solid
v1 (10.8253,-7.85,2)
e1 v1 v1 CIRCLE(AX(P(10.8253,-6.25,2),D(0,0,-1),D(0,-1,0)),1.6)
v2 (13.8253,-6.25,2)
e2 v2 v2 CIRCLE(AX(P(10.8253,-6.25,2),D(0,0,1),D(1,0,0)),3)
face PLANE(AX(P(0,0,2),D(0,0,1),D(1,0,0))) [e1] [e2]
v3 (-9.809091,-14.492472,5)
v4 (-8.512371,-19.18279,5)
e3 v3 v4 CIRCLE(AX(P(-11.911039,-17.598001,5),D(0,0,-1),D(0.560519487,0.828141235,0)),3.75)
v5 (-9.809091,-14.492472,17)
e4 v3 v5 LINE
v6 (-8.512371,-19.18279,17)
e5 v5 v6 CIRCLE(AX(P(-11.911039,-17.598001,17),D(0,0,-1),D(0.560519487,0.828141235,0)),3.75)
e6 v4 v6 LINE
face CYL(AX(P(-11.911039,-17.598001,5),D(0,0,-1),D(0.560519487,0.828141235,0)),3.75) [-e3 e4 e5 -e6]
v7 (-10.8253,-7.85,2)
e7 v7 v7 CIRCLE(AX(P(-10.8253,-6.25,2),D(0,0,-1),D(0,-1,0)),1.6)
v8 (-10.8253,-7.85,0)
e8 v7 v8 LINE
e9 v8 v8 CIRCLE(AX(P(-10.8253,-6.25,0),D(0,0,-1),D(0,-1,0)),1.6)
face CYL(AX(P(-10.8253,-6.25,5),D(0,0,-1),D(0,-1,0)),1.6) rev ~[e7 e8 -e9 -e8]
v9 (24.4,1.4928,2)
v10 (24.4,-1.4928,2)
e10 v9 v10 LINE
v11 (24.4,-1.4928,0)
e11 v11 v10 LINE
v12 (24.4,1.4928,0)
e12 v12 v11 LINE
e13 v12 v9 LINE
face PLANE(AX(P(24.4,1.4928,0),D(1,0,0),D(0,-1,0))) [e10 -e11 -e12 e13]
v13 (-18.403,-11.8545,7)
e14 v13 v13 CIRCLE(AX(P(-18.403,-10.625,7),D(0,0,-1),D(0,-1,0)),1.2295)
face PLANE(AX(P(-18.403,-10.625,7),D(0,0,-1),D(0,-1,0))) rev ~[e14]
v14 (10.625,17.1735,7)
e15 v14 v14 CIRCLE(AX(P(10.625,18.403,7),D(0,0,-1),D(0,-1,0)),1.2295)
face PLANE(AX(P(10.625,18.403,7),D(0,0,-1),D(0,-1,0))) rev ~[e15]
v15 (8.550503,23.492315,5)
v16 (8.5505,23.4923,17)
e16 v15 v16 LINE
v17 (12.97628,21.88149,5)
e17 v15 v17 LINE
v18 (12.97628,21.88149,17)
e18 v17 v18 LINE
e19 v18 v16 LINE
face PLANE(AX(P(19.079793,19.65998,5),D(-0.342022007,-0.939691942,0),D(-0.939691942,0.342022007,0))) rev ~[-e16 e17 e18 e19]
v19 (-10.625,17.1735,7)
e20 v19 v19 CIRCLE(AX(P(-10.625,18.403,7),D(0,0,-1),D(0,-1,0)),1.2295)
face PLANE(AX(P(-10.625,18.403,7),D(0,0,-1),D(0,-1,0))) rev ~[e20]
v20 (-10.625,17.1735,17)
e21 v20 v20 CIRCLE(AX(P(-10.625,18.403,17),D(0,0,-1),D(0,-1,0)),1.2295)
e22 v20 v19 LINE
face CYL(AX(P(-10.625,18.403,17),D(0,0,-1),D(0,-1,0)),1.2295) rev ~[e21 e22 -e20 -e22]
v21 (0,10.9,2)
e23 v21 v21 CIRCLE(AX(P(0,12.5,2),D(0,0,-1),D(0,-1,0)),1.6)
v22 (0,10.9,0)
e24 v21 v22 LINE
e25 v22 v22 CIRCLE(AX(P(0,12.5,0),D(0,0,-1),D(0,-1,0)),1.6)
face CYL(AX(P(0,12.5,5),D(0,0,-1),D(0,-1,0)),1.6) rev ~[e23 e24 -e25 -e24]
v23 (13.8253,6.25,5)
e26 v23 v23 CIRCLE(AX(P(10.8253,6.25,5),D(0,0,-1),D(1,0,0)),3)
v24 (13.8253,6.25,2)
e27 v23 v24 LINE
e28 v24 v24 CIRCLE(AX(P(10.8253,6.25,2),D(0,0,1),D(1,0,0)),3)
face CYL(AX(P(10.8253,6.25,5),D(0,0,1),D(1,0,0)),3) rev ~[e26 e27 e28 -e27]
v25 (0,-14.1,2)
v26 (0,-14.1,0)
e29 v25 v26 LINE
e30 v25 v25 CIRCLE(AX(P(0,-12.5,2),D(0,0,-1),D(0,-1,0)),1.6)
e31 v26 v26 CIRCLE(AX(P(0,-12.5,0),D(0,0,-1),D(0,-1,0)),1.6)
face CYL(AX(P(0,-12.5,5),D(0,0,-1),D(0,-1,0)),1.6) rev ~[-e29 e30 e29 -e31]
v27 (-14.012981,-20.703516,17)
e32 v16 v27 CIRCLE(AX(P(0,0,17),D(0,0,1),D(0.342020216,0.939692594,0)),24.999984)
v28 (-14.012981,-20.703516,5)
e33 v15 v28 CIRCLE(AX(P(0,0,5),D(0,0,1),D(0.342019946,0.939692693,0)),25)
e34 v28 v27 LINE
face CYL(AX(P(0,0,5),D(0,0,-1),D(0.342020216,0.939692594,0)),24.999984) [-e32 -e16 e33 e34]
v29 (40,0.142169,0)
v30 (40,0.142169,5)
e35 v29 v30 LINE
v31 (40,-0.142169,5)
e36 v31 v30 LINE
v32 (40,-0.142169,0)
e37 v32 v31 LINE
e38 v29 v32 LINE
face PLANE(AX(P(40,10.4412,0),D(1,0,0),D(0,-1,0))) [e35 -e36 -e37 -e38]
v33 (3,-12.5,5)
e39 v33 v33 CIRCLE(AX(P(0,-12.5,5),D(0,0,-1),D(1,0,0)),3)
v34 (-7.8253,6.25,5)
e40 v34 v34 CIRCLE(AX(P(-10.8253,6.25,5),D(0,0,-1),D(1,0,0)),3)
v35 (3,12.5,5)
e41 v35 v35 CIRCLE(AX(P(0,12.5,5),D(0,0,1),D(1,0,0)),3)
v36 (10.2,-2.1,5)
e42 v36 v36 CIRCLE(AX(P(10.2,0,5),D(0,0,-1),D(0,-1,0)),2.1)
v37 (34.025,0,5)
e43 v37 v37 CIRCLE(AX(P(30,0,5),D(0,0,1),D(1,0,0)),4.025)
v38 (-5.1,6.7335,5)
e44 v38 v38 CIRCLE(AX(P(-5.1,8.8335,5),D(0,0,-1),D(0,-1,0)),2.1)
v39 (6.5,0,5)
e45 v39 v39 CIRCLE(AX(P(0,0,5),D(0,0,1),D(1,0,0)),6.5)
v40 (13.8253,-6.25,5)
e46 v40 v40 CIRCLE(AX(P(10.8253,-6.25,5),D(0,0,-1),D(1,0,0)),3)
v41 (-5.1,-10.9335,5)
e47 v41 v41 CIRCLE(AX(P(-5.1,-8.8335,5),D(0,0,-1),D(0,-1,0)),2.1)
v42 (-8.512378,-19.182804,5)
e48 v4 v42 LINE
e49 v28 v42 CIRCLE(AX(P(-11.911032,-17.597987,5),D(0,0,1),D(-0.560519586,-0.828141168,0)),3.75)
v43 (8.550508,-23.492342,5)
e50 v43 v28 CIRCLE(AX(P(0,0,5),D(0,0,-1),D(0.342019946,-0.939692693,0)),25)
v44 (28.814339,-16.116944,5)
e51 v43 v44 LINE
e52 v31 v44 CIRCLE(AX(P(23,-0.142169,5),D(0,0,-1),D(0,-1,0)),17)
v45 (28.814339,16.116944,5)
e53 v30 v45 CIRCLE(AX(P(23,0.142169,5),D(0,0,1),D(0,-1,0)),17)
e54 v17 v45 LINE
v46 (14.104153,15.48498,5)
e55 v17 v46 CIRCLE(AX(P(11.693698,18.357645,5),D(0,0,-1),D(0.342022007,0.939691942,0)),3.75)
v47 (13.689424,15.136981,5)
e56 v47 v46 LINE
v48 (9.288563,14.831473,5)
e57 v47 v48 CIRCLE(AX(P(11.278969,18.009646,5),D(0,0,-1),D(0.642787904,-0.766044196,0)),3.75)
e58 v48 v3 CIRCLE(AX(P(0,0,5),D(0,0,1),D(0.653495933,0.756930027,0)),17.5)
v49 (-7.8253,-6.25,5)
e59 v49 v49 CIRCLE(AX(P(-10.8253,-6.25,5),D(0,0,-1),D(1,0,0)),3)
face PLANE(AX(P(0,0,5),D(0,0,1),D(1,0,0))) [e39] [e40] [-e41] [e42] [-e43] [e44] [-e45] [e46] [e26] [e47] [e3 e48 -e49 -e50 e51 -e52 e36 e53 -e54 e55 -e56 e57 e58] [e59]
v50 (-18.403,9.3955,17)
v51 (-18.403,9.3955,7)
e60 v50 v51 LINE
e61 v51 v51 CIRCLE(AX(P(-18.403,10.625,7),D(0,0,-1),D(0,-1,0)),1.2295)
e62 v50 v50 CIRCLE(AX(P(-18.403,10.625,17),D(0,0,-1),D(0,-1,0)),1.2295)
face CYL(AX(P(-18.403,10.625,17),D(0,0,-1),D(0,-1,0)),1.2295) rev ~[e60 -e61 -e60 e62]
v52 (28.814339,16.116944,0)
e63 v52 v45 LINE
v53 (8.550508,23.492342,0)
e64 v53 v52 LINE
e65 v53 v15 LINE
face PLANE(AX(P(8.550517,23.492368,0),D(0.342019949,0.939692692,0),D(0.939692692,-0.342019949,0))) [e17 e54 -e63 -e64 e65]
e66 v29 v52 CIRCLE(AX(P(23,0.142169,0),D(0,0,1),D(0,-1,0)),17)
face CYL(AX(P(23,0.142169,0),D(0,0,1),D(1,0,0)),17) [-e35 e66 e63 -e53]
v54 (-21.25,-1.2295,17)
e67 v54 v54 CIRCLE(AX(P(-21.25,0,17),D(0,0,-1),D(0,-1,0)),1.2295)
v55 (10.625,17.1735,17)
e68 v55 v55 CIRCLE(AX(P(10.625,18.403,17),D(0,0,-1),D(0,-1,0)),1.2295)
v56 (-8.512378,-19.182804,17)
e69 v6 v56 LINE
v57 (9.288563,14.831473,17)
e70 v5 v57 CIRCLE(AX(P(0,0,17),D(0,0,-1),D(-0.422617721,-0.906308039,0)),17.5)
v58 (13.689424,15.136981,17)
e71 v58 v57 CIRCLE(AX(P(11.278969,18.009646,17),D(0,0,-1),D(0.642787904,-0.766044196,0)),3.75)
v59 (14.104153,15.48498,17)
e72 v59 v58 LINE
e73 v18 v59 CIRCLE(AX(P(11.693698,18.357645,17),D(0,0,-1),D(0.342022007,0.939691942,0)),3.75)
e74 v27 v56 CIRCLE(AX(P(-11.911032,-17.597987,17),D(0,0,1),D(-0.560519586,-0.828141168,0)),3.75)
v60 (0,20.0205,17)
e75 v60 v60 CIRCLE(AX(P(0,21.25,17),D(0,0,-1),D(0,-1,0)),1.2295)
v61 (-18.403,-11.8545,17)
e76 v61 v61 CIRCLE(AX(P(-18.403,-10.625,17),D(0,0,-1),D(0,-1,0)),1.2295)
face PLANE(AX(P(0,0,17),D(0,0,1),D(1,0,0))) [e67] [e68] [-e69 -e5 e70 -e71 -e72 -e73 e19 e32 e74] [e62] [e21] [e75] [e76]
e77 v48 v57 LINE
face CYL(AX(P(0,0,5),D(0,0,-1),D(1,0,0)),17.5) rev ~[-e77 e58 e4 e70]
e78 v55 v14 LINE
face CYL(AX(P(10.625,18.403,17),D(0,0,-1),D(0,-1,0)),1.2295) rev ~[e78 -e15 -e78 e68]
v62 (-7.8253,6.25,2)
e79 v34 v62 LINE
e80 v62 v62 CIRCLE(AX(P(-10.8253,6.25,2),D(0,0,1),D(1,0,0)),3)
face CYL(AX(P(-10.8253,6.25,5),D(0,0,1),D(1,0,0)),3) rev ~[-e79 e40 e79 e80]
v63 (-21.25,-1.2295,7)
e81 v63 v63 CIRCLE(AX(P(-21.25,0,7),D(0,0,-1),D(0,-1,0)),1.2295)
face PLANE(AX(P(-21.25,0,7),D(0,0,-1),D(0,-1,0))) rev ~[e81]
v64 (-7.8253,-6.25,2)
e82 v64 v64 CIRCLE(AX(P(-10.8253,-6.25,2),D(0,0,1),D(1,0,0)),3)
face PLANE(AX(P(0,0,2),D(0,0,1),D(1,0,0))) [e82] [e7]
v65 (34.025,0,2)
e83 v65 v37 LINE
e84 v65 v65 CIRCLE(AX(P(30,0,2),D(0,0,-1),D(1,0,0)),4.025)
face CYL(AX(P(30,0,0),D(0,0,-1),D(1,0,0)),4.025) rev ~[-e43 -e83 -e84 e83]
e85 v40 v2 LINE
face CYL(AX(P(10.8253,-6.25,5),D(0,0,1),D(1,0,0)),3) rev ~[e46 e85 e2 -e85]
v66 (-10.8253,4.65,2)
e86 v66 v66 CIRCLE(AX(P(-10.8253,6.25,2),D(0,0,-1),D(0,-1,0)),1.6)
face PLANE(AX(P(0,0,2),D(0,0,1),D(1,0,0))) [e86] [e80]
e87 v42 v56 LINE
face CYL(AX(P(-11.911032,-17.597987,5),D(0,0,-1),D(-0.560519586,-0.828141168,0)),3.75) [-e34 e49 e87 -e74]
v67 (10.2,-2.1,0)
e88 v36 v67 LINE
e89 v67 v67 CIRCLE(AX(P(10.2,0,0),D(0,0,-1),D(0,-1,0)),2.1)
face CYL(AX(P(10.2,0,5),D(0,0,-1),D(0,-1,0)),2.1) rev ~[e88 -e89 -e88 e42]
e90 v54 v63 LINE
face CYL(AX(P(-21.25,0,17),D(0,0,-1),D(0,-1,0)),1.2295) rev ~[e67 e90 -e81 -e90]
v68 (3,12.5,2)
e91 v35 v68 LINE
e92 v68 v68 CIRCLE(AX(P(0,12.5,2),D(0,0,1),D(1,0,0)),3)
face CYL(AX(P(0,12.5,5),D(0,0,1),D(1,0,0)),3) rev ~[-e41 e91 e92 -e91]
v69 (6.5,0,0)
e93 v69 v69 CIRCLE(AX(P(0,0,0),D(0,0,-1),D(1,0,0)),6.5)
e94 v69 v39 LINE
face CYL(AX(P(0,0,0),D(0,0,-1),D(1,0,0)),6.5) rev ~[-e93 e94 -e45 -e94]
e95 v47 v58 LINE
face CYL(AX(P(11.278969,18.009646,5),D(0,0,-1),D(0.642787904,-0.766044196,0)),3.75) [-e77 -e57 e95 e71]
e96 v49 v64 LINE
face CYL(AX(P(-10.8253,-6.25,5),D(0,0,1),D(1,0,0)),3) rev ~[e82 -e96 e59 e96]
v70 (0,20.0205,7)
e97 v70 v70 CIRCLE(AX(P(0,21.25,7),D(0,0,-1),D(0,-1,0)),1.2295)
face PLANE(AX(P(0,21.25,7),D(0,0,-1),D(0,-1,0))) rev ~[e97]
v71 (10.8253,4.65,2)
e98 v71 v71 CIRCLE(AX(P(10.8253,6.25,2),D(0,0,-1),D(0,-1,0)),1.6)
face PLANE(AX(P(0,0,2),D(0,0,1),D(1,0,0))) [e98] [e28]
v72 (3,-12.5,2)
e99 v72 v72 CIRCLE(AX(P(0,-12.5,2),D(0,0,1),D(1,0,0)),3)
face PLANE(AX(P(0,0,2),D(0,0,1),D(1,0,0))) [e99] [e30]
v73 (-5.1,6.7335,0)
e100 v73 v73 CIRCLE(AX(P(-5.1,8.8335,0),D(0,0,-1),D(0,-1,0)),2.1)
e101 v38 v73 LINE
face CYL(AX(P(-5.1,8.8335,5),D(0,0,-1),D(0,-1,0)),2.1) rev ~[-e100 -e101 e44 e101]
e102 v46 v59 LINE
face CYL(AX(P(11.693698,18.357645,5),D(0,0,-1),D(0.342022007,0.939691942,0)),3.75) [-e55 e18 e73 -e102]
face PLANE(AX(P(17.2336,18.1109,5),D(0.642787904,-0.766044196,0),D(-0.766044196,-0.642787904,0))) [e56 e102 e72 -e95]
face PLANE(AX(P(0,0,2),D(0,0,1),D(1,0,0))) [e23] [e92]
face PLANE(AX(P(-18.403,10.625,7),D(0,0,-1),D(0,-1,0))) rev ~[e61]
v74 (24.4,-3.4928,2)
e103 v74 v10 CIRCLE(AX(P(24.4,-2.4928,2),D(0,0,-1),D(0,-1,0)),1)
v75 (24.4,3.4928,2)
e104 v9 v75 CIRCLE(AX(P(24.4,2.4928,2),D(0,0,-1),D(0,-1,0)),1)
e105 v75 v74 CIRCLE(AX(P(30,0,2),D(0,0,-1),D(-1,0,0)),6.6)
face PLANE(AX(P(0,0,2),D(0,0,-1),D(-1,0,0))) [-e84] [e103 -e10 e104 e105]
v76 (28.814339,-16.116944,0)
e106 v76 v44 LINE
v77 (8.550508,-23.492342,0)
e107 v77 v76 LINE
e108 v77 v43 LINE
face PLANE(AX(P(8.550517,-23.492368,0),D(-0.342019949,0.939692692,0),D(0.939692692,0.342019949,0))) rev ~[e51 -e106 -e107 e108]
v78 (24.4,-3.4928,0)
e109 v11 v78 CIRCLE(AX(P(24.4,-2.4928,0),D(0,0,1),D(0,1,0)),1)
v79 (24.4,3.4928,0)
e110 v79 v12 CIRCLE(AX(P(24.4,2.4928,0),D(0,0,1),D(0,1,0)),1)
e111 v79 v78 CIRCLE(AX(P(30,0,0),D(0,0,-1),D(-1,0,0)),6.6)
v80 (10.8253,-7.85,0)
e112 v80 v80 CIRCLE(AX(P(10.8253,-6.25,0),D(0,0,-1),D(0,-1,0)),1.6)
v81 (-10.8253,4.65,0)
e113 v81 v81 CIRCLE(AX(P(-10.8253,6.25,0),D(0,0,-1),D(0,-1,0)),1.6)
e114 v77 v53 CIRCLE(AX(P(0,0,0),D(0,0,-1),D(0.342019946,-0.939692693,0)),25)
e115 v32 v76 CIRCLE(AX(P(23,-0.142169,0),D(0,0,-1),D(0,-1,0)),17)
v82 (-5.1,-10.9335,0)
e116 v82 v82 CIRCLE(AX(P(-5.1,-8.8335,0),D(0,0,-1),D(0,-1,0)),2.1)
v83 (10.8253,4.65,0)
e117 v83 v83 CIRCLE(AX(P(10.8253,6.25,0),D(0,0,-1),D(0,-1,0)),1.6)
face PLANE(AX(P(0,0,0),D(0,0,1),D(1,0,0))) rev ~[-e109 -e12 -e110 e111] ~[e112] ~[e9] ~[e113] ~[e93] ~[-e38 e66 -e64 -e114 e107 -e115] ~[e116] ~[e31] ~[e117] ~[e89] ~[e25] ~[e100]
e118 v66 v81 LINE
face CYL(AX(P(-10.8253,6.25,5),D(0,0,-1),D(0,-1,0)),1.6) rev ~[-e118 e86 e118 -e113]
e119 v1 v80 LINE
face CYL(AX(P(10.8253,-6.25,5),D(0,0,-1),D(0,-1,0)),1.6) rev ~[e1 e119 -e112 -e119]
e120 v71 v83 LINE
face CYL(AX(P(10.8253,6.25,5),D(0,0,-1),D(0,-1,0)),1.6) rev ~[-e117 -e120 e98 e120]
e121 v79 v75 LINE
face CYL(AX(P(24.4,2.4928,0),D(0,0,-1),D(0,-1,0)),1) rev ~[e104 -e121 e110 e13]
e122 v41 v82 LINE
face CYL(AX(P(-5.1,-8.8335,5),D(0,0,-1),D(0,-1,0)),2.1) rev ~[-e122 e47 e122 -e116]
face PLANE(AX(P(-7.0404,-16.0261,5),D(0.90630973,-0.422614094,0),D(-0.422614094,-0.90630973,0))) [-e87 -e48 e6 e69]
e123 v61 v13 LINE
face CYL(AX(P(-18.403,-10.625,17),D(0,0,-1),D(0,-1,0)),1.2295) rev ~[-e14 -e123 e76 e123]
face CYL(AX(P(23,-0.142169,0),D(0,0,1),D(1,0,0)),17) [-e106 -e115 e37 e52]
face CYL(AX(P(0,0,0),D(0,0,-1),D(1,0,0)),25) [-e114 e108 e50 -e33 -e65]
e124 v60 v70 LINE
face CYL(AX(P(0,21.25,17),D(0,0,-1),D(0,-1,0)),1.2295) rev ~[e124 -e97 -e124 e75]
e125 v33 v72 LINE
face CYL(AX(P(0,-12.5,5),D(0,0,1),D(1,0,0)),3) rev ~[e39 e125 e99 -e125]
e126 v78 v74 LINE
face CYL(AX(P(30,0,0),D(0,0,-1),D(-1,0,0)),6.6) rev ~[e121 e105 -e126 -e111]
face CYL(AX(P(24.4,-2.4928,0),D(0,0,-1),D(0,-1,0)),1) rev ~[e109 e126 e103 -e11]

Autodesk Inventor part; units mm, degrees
ref_plane "YZ Plane" through (0, 0, 0) normal (1, 0, 0) x (0, 1, 0)
ref_plane "XZ Plane" through (0, 0, 0) normal (0, 1, 0) x (-1, 0, 0)
ref_plane "作業平面1" through (0, 0, 14) normal (0, 0, 1) x (-0.9659258, -0.258819, 0)
sketch "スケッチ14" plane through (0, 0, 0) normal (0, 0, 1) x (1, 0, 0)
  circle A0 centre (0, 0) radius 25
  circle A1 centre (30, 0) radius 4.025
  line L0 (0, 25) -> (40, 25)
  line L1 (40, 25) -> (40, -25)
  line L2 (40, -25) -> (0, -25)
  line L3 (0, -25) -> (0, 25)
  line L4 (0, -25) -> (40, -10.4412)
  line L5 (0, 25) -> (40, 10.4412)
  line L6 (0.5157, 26.4168) -> (40.5157, 11.858)
  line L7 (0.5157, -26.4168) -> (40.5157, -11.858)
  circle A2 centre (0, 0) radius 6.5
  line L8 (40.5157, -11.858) -> (63.847, -3.366)
  line L9 (37.8689, 40.3876) -> (23.4147, 35.1267)
  line L10 (23.4147, 35.1267) -> (-16.5853, 20.5679)
  line L11 (-16.5853, 20.5679) -> (-32.0428, 14.9418)
  line L12 (-32.0428, 14.9418) -> (-14.9418, -32.0428)
  line L13 (-14.9418, -32.0428) -> (0.5157, -26.4168)
  line L14 (40, 12.0456) -> (47.7428, -9.2275)
  line L15 (40, 12.0456) -> (30.6418, 37.7571)
  point P0 (8.5505, -23.4923)
  point P1 (40, -12.0456)
  point P2 (40, 12.0456)
  point P3 (8.5505, 23.4923)
  dimension "d111" = 50
  dimension "d112" = 8.05
  dimension "d113" = 30
  dimension "d114" = 40
  dimension "d115" = 50
  dimension "d116" = 25
  dimension "d119" = 25
  dimension "d126" = 20
  dimension "d127" = 20
  dimension "d144" = 13
  dimension "d201" = 90
  dimension "d202" = 90
extrude "押し出し9" add sketch "スケッチ14" along normal blind 5 contours A0 L4 L3 A2 L5 | A0 L5 L1 L4 | L5 A0 | A0 L6 L1 L5 | L4 L1 L7 A0 | A0 L4 | L3 A2 A0
sketch "スケッチ15" plane through (0, 0, 0) normal (0, 0, -1) x (-1, 0, 0)
  circle A0 centre (-30, 0) radius 4.025 projected
  circle A1 centre (-30, 0) radius 6.6
  line L0 (-24.4, 3.4928) -> (-24.4, -3.4928)
  arc A2 (-24.4, 1.4928) -> (-24.4, 3.4928) centre (-24.4, 2.4928) ccw
  arc A3 (-24.4, -3.4928) -> (-24.4, -1.4928) centre (-24.4, -2.4928) ccw
  point P0 (0, 0)
  dimension "d122" = 13.2
  dimension "d203" = 5.6
  dimension "d204" = 1
  dimension "d205" = 1
  dimension "d206" = 0
  dimension "d207" = 0
extrude "押し出し10" cut sketch "スケッチ15" against normal blind 2 contours L0 A1 | A2 A1 | A1 A2 L0 | L0 A3 A1 | A1 A3
sketch "スケッチ16" plane through (0, 0, 5) normal (0, 0, 1) x (1, 0, 0)
  circle A0 centre (30, 0) radius 4.025 projected
  circle A1 centre (30, 0) radius 17
  arc A2 (8.5505, 23.4923) -> (8.5505, -23.4923) centre (0, 0) ccw projected
  circle A3 centre (0, 0) radius 25
  line L0 (40, -12.0456) -> (40, 12.0456) projected
  line L1 (40, 12.0456) -> (-0.2187, 26.6841)
  line L2 (40, -12.0456) -> (-2.6962, -27.5858)
  circle A4 centre (0, 0) radius 17.5
  line L3 (8.5505, 23.4923) -> (5.9854, 16.4446)
  line L4 (-17.5, 0) -> (-25, 0)
  line L5 (-2.7839, 19.6364) -> (32.5, 6.7941)
  line L6 (32.5, 6.7941) -> (32.5, -6.7941)
  line L7 (32.5, -6.7941) -> (-5.2613, -20.5381)
  line L8 (17.9474, 20.0721) -> (15.3823, 13.0244)
  line L9 (-17.5, 0) -> (0, 0)
  line L10 (-13.6656, -12.9367) -> (-0.4151, -19.1155)
  line L11 (-7.0404, -16.0261) -> (-11.4484, -25.4792)
  line L12 (17.2336, 18.1109) -> (11.4362, 13.2463)
  line L13 (18.0185, 5.7516) -> (7.3857, 18.4233)
  line L14 (0, 25) -> (0, 10.5586)
  line L15 (17.2336, 18.1109) -> (19.0798, 19.66)
  point P0 (0, -25)
  point P1 (-11.8057, -12.918)
  point P2 (-10.2087, -22.8207)
  point P3 (-7.3958, -15.8604)
  dimension "d125" = 34
  dimension "d128" = 7.5
  dimension "d164" = 7.5
  dimension "d165" = 10
  dimension "d186" = 90
  dimension "d187" = 65
  dimension "d196" = 30
extrude "押し出し11" add sketch "スケッチ16" along normal blind 12 contours L12 L5 L3 A3 | A3 L1 L8 | L8 L1 L15 | L3 L5 L14 A2 | L12 L13 L5 | A2 L4 A4 L10 L11 | L14 A4 L4 A2 | L5 L13 L12 A4 | A4 L14 L5
sketch "スケッチ17" plane through (0, 0, 5) normal (0, 0, 1) x (1, 0, 0)
  circle A0 centre (30, 0) radius 4.025 projected
  line L0 (0, 0) -> (30, 0)
  circle A1 centre (0, 0) radius 12.5
  line L1 (0, 0) -> (12.4415, 7.1831)
  point P0 (10.8253, 6.25)
  point P1 (0, 12.5)
  point P2 (-10.8253, 6.25)
  point P3 (-10.8253, -6.25)
  point P4 (0, -12.5)
  point P5 (10.8253, -6.25)
  dimension "d131" = 25
  dimension "d132" = 30
  dimension "d135" = 360
hole "穴5" at (10.8253, 6.25, 5) at (0, 12.5, 5) at (-10.8253, 6.25, 5) at (-10.8253, -6.25, 5) at (0, -12.5, 5) at (10.8253, -6.25, 5) direction (0, 0, -1) diameter 3.2 end through all
sketch "スケッチ18" plane through (0, 0, 5) normal (0, 0, 1) x (1, 0, 0)
  circle A0 centre (30, 0) radius 4.025 projected
  line L0 (0, 0) -> (30, 0)
  circle A1 centre (0, 0) radius 10.2
  point P0 (10.2, 0)
  point P1 (-5.1, 8.8335)
  point P2 (-5.1, -8.8335)
  dimension "d145" = 20.4
  dimension "d148" = 360
hole "穴6" at (10.2, 0, 5) at (-5.1, 8.8335, 5) at (-5.1, -8.8335, 5) direction (0, 0, -1) diameter 4.2 end through all
sketch "スケッチ19" plane through (0, 0, 5) normal (0, 0, 1) x (1, 0, 0)
  circle A0 centre (0, 12.5) radius 1.6 projected
  circle A1 centre (0, 0) radius 12.5
  circle A2 centre (0, 12.5) radius 3
  circle A3 centre (-10.8253, 6.25) radius 3
  circle A4 centre (-10.8253, -6.25) radius 3
  circle A5 centre (0, -12.5) radius 3
  circle A6 centre (10.8253, -6.25) radius 3
  circle A7 centre (10.8253, 6.25) radius 3
  dimension "d157" = 6
  dimension "d160" = 360
extrude "押し出し12" cut sketch "スケッチ19" against normal blind 3 contours A0 A1 | A0 A1 A2 | A1 A0 | A0 A1 A2 | A3 A1 | A1 A3 | A7 A1 | A1 A7 | A4 A1 | A1 A4 | A6 A1 | A1 A6 | A5 A1 | A1 A5
sketch "スケッチ20" plane through (0, 0, 17) normal (0, 0, 1) x (1, 0, 0)
  line L0 (19.0798, 19.66) -> (8.5505, 23.4923) projected
  line L1 (17.9474, 20.0721) -> (15.3823, 13.0244)
  line L2 (15.3823, 13.0244) -> (5.9854, 16.4446)
  line L3 (5.9854, 16.4446) -> (8.5505, 23.4923)
  line L4 (0, 0) -> (0, 30.7788)
  circle A0 centre (0, 0) radius 21.25
  circle A1 centre (0, 0) radius 25
  point P0 (11.9664, 18.2584)
  point P1 (0, 21.25)
  point P2 (-10.625, 18.403)
  point P3 (-18.403, 10.625)
  point P4 (-21.25, 0)
  point P5 (-18.403, -10.625)
  point P6 (-10.625, -18.403)
  point P7 (0, -21.25)
  point P8 (10.625, -18.403)
  point P9 (18.403, -10.625)
  point P10 (21.25, 0)
  point P11 (18.403, 10.625)
  point P12 (10.625, 18.403)
  dimension "d167" = 7.5
  dimension "d168" = 5
  dimension "d169" = 3.75
  dimension "d170" = 3.75
  dimension "d171" = 50
  dimension "d174" = 360
hole "穴7" at (10.625, 18.403, 17) at (0, 21.25, 17) at (-10.625, 18.403, 17) at (-18.403, 10.625, 17) direction (0, 0, -1) diameter 2.459 depth 10 thread size "M3x0.5" class "6H" standard "ISO Metric profile"
fillet "フィレット9" radius 17 2 edges at (40, 12.0456, 2.5) (40, -12.0456, 2.5)
sketch "スケッチ21" plane through (0, 0, 17) normal (0, 0, 1) x (1, 0, 0)
  circle A0 centre (-18.403, 10.625) radius 1.2295 projected
  circle A1 centre (0, 0) radius 21.25
  line L0 (0, 0) -> (-31.1052, 0)
  point P0 (-21.25, 0)
  point P1 (-18.403, -10.625)
hole "穴8" at (-21.25, 0, 17) at (-18.403, -10.625, 17) direction (0, 0, -1) diameter 2.459 depth 10 thread size "M3x0.5" class "6H" standard "ISO Metric profile"
fillet "フィレット12" radius 3.75 4 edges at (-7.0404, -16.0261, 11) (-10.2087, -22.8207, 11) (19.0798, 19.66, 11) (11.4362, 13.2463, 11)
properties part number "RP_Thigh-Base" material "アルミニウム 6061"
